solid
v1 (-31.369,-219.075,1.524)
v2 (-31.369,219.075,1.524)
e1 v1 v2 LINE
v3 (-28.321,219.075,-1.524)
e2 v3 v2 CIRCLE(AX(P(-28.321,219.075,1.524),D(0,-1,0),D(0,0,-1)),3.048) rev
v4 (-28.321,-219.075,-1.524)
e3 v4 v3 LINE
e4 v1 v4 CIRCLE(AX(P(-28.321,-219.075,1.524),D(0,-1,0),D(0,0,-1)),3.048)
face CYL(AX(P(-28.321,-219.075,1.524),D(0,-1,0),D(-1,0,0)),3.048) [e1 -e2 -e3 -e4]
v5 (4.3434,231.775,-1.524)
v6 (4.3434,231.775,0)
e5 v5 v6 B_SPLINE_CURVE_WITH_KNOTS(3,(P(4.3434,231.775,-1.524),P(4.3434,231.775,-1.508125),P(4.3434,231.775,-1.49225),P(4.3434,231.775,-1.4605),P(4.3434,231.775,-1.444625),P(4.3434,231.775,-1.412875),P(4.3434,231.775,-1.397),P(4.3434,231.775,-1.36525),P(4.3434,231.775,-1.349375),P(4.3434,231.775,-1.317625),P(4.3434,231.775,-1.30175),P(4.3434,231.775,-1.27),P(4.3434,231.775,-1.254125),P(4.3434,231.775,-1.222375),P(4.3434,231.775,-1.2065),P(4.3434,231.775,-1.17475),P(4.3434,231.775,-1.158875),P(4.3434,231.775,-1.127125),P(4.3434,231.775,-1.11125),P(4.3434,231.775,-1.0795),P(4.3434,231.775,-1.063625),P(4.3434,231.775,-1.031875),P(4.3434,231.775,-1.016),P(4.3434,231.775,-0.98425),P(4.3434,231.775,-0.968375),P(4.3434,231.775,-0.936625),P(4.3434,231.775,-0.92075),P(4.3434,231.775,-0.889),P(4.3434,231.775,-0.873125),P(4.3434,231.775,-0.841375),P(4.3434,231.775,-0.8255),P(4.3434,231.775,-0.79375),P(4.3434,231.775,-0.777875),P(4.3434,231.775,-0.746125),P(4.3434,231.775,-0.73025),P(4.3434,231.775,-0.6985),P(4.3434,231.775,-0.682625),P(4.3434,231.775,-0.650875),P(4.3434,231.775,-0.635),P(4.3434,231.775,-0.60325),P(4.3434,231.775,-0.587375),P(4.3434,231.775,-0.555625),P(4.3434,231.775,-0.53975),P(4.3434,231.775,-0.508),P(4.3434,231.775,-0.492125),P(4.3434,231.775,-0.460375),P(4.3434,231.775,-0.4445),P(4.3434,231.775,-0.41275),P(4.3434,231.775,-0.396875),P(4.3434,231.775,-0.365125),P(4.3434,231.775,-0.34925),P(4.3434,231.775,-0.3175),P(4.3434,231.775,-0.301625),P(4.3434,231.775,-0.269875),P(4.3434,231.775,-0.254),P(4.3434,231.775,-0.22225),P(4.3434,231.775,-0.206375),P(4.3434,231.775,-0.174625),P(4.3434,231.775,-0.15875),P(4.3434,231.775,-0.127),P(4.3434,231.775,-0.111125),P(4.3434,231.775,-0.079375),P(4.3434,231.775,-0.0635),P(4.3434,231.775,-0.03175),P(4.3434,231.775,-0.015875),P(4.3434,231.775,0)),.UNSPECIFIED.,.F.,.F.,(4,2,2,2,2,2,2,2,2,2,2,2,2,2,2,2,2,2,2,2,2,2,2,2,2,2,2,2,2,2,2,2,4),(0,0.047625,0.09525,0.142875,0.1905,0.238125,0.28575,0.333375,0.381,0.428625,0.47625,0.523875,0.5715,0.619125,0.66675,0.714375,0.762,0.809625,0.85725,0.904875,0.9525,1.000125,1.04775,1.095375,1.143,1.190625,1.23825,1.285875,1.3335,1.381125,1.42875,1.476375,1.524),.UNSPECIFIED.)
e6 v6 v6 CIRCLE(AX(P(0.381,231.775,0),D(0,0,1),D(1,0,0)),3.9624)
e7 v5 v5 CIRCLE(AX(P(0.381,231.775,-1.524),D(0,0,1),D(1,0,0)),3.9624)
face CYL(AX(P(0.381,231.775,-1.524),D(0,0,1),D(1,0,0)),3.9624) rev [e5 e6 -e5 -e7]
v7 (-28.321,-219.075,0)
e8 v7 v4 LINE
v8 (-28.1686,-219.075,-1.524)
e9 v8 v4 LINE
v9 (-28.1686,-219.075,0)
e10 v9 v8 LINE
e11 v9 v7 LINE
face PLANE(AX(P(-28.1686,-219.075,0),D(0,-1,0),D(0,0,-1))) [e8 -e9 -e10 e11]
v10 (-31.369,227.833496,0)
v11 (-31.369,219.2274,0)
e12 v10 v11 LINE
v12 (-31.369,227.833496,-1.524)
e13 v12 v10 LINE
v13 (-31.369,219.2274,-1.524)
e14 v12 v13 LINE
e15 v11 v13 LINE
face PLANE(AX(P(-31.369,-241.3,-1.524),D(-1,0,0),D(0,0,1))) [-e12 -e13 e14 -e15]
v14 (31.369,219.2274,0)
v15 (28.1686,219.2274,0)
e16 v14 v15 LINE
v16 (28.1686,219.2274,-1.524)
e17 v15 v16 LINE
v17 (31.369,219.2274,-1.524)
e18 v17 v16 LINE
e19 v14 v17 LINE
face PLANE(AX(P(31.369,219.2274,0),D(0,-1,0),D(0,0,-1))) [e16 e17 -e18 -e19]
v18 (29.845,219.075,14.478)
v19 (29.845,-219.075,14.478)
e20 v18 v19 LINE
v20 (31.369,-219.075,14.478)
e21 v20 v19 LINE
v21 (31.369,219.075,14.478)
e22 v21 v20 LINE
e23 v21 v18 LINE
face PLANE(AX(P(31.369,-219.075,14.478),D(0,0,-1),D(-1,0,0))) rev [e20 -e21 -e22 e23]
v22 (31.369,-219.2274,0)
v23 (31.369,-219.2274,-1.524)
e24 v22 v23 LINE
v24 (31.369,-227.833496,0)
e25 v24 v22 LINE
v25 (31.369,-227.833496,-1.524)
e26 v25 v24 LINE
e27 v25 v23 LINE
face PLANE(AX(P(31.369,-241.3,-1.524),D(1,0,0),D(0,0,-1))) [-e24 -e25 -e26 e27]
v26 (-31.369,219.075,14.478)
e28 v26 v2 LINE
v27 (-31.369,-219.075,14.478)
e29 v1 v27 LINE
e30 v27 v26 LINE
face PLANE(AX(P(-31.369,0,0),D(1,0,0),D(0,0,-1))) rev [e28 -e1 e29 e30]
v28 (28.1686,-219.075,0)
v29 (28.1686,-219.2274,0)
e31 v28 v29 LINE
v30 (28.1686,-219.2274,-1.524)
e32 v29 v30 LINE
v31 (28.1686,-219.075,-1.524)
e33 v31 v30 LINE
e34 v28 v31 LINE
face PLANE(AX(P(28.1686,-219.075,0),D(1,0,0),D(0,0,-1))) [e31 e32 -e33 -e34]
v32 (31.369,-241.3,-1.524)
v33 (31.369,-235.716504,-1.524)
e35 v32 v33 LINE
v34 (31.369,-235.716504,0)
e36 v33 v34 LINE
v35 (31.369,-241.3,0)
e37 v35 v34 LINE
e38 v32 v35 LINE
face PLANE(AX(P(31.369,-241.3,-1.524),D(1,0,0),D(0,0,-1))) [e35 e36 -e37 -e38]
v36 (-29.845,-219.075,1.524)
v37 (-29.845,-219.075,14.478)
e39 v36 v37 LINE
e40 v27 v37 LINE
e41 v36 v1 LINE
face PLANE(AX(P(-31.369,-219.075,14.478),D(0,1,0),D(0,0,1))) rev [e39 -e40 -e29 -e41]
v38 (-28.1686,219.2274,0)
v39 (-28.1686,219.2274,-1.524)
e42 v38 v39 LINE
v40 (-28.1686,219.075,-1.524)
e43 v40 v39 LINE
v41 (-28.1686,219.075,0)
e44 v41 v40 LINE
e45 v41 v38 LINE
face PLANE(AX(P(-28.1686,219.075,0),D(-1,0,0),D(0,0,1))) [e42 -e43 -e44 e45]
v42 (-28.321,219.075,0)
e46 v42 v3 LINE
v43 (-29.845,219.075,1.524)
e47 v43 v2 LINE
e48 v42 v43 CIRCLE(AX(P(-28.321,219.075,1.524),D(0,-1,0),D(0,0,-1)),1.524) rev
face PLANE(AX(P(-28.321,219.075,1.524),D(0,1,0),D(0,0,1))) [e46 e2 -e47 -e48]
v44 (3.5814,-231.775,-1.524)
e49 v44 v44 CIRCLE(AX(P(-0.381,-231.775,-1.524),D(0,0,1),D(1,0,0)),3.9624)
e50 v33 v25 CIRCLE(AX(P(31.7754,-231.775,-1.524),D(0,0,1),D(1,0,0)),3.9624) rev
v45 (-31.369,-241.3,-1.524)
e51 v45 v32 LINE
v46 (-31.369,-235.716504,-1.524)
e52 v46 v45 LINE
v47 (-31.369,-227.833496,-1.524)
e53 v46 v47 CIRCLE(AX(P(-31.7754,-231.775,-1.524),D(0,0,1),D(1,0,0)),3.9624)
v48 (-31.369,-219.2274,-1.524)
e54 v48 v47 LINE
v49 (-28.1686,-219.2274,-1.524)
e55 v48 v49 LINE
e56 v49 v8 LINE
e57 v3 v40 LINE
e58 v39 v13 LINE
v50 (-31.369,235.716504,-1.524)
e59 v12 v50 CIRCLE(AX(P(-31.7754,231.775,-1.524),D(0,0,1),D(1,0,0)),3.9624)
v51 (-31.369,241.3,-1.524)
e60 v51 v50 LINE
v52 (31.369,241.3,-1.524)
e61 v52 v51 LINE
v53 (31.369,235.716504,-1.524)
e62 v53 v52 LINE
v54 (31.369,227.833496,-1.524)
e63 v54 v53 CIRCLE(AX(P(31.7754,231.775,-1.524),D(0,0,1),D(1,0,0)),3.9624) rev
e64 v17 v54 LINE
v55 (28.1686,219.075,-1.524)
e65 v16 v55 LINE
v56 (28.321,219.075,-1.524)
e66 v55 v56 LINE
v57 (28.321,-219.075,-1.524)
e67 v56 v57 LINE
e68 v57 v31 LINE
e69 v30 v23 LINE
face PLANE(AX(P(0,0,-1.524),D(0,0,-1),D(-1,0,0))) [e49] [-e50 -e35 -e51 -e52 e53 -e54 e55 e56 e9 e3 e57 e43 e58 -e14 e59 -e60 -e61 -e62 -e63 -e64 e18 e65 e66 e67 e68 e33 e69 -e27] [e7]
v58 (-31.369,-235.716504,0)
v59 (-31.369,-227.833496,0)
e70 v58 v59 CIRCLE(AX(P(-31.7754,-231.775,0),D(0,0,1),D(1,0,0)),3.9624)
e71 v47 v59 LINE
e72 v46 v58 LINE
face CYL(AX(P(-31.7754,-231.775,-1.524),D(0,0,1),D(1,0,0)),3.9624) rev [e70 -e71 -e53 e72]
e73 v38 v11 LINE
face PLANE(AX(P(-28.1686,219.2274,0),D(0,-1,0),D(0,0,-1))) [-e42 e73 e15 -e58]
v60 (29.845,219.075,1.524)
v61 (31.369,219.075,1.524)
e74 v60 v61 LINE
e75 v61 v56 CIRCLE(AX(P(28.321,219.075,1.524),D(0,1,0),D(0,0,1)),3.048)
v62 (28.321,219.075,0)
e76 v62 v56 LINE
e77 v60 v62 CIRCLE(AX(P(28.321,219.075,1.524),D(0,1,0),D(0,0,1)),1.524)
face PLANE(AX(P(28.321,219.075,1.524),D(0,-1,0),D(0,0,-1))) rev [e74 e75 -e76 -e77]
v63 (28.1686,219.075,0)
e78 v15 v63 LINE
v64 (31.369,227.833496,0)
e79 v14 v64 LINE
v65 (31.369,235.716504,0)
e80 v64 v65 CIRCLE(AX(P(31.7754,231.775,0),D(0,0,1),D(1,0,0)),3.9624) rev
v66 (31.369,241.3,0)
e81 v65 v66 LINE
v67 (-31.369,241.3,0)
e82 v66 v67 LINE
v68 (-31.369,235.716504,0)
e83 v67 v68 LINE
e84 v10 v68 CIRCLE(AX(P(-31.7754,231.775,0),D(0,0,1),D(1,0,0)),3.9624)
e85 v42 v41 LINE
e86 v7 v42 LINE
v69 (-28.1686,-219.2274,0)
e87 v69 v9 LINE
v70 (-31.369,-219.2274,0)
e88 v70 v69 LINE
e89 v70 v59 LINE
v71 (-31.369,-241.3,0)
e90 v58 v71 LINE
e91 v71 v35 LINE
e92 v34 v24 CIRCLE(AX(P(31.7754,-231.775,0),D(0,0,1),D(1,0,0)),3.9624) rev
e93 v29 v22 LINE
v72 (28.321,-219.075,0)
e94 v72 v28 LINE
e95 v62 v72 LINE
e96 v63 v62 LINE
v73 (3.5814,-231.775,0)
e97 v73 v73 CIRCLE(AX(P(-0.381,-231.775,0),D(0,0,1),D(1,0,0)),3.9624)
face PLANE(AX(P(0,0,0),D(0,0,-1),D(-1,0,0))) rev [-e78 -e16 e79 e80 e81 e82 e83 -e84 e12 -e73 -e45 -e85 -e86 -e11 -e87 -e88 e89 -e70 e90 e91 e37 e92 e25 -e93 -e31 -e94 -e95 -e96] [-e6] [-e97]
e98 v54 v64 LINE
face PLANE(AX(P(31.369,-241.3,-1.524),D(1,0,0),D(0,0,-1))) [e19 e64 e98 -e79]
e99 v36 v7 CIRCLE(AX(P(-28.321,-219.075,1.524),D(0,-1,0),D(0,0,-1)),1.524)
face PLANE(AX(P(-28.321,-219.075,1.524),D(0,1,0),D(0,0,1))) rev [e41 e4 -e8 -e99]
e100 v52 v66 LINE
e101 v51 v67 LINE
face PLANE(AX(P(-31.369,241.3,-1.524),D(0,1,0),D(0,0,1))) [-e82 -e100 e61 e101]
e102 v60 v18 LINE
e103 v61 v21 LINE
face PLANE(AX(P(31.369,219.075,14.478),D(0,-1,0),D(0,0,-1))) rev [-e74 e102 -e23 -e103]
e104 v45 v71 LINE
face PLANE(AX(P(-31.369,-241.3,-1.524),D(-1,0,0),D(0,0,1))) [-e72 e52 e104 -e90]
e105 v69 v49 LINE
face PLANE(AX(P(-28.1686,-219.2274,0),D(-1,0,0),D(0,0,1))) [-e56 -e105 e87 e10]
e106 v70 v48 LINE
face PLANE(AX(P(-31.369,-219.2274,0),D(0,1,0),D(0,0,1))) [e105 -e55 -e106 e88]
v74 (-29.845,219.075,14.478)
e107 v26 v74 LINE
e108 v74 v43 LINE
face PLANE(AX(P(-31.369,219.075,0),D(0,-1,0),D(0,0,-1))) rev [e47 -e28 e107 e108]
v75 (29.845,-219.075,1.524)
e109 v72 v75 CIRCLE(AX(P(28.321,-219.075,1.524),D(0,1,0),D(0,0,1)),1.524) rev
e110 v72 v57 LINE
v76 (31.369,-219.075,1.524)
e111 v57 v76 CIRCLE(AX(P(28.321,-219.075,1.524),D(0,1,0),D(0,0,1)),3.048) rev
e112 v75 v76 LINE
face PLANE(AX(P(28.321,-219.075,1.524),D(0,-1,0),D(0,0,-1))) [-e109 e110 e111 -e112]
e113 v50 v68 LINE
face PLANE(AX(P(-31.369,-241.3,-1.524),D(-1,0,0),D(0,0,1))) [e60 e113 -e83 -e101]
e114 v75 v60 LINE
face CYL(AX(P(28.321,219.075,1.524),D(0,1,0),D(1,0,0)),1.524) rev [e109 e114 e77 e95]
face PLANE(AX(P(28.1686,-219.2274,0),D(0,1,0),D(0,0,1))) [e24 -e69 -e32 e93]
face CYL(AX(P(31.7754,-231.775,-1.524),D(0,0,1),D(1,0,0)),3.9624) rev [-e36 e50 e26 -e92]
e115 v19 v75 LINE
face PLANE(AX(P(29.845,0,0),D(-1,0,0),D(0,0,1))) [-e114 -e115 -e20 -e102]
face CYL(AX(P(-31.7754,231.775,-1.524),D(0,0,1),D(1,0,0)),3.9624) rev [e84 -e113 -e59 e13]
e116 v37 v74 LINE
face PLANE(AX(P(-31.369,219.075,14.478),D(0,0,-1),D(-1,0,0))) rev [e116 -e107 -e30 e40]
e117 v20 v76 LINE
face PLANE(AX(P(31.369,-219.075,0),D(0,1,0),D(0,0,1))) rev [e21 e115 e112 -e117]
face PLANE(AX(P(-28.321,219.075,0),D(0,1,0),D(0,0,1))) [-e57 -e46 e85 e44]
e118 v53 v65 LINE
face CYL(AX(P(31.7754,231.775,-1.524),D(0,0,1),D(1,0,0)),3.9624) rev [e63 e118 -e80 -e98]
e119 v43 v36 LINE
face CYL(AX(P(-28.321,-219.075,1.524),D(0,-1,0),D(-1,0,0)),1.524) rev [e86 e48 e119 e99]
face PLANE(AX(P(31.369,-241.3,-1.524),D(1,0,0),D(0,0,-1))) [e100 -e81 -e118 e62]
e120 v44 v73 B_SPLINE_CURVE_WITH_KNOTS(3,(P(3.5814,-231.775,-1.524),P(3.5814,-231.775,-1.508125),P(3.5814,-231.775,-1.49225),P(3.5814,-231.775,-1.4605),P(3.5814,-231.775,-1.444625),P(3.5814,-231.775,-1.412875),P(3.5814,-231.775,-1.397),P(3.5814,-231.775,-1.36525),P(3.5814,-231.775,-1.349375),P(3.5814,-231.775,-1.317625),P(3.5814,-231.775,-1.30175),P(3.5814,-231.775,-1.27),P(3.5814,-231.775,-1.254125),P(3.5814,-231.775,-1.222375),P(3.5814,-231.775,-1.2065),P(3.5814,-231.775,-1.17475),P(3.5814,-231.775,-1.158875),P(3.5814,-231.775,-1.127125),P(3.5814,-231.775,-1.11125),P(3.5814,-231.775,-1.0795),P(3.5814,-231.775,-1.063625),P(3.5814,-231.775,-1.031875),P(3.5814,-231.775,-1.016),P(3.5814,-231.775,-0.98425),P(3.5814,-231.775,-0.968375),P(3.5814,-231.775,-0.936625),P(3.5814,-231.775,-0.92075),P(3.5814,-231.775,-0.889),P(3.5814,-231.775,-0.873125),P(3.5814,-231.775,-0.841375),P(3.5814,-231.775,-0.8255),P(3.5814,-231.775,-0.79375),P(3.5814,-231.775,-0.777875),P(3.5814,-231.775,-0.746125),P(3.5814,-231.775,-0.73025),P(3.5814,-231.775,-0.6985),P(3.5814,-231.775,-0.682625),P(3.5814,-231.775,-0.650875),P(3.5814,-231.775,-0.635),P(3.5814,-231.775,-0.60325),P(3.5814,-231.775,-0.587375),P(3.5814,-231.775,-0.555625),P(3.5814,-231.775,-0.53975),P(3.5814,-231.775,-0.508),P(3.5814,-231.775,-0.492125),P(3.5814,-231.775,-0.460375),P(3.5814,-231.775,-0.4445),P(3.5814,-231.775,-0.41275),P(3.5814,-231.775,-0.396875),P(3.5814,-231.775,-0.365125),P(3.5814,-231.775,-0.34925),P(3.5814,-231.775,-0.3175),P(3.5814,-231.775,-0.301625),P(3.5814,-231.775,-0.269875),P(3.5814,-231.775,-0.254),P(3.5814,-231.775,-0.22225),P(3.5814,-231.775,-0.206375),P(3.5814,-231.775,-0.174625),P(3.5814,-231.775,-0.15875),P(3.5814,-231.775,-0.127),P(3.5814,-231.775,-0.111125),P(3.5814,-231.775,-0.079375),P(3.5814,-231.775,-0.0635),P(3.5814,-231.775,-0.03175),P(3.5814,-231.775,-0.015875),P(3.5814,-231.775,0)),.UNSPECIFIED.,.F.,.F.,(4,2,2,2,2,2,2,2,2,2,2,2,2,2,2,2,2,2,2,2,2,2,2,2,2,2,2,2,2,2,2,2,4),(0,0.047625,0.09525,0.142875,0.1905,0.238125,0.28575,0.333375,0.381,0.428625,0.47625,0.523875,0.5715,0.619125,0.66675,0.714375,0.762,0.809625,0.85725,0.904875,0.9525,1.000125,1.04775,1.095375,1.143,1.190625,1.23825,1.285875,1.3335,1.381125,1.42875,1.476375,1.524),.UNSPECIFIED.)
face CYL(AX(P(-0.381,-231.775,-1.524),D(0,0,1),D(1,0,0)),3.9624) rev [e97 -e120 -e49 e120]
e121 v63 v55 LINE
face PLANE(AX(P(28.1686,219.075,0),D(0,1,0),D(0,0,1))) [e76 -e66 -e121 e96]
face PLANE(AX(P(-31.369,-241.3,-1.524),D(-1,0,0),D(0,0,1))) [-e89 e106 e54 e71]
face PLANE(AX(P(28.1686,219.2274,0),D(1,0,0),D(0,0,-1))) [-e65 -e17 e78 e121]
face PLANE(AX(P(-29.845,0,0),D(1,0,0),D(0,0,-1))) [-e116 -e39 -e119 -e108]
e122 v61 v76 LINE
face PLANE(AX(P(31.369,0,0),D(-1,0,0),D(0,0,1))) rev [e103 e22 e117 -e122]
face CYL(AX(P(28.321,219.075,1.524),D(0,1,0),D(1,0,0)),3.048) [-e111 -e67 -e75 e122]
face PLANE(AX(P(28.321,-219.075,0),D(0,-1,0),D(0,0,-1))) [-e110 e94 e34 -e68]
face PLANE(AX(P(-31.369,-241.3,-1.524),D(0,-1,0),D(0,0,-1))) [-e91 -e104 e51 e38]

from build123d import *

# Parameters (mm, degrees)
CROQUIS1_W                          = 62.738
CROQUIS1_H                          = 482.6
CROQUIS1_R                          = 3.9624
BRIDA_BASE1_DEPTH                   = 1.524
BRIDA_DE_ARISTA1_STRIP_W            = 9.144
BRIDA_DE_ARISTA1_STRIP_H            = 1.524
BRIDA_DE_ARISTA1_STRIP_CUT_DEPTH    = 438.15
BRIDA_DE_ARISTA1_RELIEF_W           = 9.2964
BRIDA_DE_ARISTA1_RELIEF_H           = 0.1524
BRIDA_DE_ARISTA1_RELIEF_CUT_DEPTH   = 1.524
BRIDA_DE_ARISTA1_STRIP_2_W          = 9.144
BRIDA_DE_ARISTA1_STRIP_2_H          = 1.524
BRIDA_DE_ARISTA1_STRIP_CUT_2_DEPTH  = 438.15
BRIDA_DE_ARISTA1_RELIEF_2_W         = 9.2964
BRIDA_DE_ARISTA1_RELIEF_2_H         = 0.1524
BRIDA_DE_ARISTA1_RELIEF_CUT_2_DEPTH = 1.524
BRIDA_DE_ARISTA1_DEPTH              = 438.15
BRIDA_DE_ARISTA1_BEND_DEPTH         = 438.15
CROQUIS15_R                         = 3.9624
CORTAR_EXTRUIR1_DEPTH               = 244.760777495


# Sheet-metal steps are written as plain solids
with BuildPart() as part:
    # Croquis1 → Brida base1 (new body)
    with BuildSketch(Plane.XY):
        Rectangle(CROQUIS1_W, CROQUIS1_H)
        with Locations((0.381, 231.775)):
            Circle(CROQUIS1_R, mode=Mode.SUBTRACT)
        with Locations((-0.381, -231.775)):
            Circle(CROQUIS1_R, mode=Mode.SUBTRACT)
    extrude(amount=-BRIDA_BASE1_DEPTH)

    # Brida de arista1 strip (across the edge) → Brida de arista1 strip cut (cut)
    with BuildSketch(Plane(origin=(31.369, -219.075, 0), x_dir=(-1, 0, 0), z_dir=(0, 1, 0))):
        with Locations((-1.524, -0.762)):
            Rectangle(BRIDA_DE_ARISTA1_STRIP_W, BRIDA_DE_ARISTA1_STRIP_H)
    extrude(amount=BRIDA_DE_ARISTA1_STRIP_CUT_DEPTH, mode=Mode.SUBTRACT)

    # Brida de arista1 relief (on the sheet) → Brida de arista1 relief cut (cut)
    with BuildSketch(Plane(origin=(28.321, -219.075, 0), x_dir=(-1, 0, 0), z_dir=(0, 0, 1))):
        with Locations((-4.4958, 0.0762)):
            Rectangle(BRIDA_DE_ARISTA1_RELIEF_W, BRIDA_DE_ARISTA1_RELIEF_H)
        with Locations((-4.4958, -438.2262)):
            Rectangle(BRIDA_DE_ARISTA1_RELIEF_W, BRIDA_DE_ARISTA1_RELIEF_H)
    extrude(amount=-BRIDA_DE_ARISTA1_RELIEF_CUT_DEPTH, mode=Mode.SUBTRACT)

    # Brida de arista1 strip 2 (across the edge) → Brida de arista1 strip cut 2 (cut)
    with BuildSketch(Plane(origin=(-31.369, 219.075, 0), x_dir=(1, 0, 0), z_dir=(0, -1, 0))):
        with Locations((-1.524, -0.762)):
            Rectangle(BRIDA_DE_ARISTA1_STRIP_2_W, BRIDA_DE_ARISTA1_STRIP_2_H)
    extrude(amount=BRIDA_DE_ARISTA1_STRIP_CUT_2_DEPTH, mode=Mode.SUBTRACT)

    # Brida de arista1 relief 2 (on the sheet) → Brida de arista1 relief cut 2 (cut)
    with BuildSketch(Plane(origin=(-28.321, 219.075, 0), x_dir=(1, 0, 0), z_dir=(0, 0, 1))):
        with Locations((-4.4958, 0.0762)):
            Rectangle(BRIDA_DE_ARISTA1_RELIEF_2_W, BRIDA_DE_ARISTA1_RELIEF_2_H)
        with Locations((-4.4958, -438.2262)):
            Rectangle(BRIDA_DE_ARISTA1_RELIEF_2_W, BRIDA_DE_ARISTA1_RELIEF_2_H)
    extrude(amount=-BRIDA_DE_ARISTA1_RELIEF_CUT_2_DEPTH, mode=Mode.SUBTRACT)

    # Brida de arista1 section (across the edge) → Brida de arista1 (add)
    with BuildSketch(Plane(origin=(31.369, -219.075, 0), x_dir=(-1, 0, 0), z_dir=(0, 1, 0))):
        with BuildLine():
            Line((0, 1.524), (0, 14.478))
            Line((0, 14.478), (1.524, 14.478))
            Line((1.524, 14.478), (1.524, 1.524))
            ThreePointArc((1.524, 1.524), (1.970369265, 0.446369265), (3.048, 0))
            Line((3.048, 0), (3.048, -1.524))
            ThreePointArc((3.048, -1.524), (0.892738531, -0.631261469), (0, 1.524))
        make_face()
    extrude(amount=BRIDA_DE_ARISTA1_DEPTH)

    # Brida de arista1 section 2 (across the edge) → Brida de arista1 bend (add)
    with BuildSketch(Plane(origin=(-31.369, 219.075, 0), x_dir=(1, 0, 0), z_dir=(0, -1, 0))):
        with BuildLine():
            Line((0, 1.524), (0, 14.478))
            Line((0, 14.478), (1.524, 14.478))
            Line((1.524, 14.478), (1.524, 1.524))
            ThreePointArc((1.524, 1.524), (1.970369265, 0.446369265), (3.048, 0))
            Line((3.048, 0), (3.048, -1.524))
            ThreePointArc((3.048, -1.524), (0.892738531, -0.631261469), (0, 1.524))
        make_face()
    extrude(amount=BRIDA_DE_ARISTA1_BEND_DEPTH)

    # Croquis15 → Cortar-Extruir1 (cut, through all)
    with BuildSketch(Plane.XY):
        with Locations((-31.7754, 231.775)):
            Circle(CROQUIS15_R)
        with Locations((-31.7754, -231.775)):
            Circle(CROQUIS15_R)
        with Locations((31.7754, -231.775)):
            Circle(CROQUIS15_R)
        with Locations((31.7754, 231.775)):
            Circle(CROQUIS15_R)
    extrude(amount=-CORTAR_EXTRUIR1_DEPTH, mode=Mode.SUBTRACT)


solid = part.part
